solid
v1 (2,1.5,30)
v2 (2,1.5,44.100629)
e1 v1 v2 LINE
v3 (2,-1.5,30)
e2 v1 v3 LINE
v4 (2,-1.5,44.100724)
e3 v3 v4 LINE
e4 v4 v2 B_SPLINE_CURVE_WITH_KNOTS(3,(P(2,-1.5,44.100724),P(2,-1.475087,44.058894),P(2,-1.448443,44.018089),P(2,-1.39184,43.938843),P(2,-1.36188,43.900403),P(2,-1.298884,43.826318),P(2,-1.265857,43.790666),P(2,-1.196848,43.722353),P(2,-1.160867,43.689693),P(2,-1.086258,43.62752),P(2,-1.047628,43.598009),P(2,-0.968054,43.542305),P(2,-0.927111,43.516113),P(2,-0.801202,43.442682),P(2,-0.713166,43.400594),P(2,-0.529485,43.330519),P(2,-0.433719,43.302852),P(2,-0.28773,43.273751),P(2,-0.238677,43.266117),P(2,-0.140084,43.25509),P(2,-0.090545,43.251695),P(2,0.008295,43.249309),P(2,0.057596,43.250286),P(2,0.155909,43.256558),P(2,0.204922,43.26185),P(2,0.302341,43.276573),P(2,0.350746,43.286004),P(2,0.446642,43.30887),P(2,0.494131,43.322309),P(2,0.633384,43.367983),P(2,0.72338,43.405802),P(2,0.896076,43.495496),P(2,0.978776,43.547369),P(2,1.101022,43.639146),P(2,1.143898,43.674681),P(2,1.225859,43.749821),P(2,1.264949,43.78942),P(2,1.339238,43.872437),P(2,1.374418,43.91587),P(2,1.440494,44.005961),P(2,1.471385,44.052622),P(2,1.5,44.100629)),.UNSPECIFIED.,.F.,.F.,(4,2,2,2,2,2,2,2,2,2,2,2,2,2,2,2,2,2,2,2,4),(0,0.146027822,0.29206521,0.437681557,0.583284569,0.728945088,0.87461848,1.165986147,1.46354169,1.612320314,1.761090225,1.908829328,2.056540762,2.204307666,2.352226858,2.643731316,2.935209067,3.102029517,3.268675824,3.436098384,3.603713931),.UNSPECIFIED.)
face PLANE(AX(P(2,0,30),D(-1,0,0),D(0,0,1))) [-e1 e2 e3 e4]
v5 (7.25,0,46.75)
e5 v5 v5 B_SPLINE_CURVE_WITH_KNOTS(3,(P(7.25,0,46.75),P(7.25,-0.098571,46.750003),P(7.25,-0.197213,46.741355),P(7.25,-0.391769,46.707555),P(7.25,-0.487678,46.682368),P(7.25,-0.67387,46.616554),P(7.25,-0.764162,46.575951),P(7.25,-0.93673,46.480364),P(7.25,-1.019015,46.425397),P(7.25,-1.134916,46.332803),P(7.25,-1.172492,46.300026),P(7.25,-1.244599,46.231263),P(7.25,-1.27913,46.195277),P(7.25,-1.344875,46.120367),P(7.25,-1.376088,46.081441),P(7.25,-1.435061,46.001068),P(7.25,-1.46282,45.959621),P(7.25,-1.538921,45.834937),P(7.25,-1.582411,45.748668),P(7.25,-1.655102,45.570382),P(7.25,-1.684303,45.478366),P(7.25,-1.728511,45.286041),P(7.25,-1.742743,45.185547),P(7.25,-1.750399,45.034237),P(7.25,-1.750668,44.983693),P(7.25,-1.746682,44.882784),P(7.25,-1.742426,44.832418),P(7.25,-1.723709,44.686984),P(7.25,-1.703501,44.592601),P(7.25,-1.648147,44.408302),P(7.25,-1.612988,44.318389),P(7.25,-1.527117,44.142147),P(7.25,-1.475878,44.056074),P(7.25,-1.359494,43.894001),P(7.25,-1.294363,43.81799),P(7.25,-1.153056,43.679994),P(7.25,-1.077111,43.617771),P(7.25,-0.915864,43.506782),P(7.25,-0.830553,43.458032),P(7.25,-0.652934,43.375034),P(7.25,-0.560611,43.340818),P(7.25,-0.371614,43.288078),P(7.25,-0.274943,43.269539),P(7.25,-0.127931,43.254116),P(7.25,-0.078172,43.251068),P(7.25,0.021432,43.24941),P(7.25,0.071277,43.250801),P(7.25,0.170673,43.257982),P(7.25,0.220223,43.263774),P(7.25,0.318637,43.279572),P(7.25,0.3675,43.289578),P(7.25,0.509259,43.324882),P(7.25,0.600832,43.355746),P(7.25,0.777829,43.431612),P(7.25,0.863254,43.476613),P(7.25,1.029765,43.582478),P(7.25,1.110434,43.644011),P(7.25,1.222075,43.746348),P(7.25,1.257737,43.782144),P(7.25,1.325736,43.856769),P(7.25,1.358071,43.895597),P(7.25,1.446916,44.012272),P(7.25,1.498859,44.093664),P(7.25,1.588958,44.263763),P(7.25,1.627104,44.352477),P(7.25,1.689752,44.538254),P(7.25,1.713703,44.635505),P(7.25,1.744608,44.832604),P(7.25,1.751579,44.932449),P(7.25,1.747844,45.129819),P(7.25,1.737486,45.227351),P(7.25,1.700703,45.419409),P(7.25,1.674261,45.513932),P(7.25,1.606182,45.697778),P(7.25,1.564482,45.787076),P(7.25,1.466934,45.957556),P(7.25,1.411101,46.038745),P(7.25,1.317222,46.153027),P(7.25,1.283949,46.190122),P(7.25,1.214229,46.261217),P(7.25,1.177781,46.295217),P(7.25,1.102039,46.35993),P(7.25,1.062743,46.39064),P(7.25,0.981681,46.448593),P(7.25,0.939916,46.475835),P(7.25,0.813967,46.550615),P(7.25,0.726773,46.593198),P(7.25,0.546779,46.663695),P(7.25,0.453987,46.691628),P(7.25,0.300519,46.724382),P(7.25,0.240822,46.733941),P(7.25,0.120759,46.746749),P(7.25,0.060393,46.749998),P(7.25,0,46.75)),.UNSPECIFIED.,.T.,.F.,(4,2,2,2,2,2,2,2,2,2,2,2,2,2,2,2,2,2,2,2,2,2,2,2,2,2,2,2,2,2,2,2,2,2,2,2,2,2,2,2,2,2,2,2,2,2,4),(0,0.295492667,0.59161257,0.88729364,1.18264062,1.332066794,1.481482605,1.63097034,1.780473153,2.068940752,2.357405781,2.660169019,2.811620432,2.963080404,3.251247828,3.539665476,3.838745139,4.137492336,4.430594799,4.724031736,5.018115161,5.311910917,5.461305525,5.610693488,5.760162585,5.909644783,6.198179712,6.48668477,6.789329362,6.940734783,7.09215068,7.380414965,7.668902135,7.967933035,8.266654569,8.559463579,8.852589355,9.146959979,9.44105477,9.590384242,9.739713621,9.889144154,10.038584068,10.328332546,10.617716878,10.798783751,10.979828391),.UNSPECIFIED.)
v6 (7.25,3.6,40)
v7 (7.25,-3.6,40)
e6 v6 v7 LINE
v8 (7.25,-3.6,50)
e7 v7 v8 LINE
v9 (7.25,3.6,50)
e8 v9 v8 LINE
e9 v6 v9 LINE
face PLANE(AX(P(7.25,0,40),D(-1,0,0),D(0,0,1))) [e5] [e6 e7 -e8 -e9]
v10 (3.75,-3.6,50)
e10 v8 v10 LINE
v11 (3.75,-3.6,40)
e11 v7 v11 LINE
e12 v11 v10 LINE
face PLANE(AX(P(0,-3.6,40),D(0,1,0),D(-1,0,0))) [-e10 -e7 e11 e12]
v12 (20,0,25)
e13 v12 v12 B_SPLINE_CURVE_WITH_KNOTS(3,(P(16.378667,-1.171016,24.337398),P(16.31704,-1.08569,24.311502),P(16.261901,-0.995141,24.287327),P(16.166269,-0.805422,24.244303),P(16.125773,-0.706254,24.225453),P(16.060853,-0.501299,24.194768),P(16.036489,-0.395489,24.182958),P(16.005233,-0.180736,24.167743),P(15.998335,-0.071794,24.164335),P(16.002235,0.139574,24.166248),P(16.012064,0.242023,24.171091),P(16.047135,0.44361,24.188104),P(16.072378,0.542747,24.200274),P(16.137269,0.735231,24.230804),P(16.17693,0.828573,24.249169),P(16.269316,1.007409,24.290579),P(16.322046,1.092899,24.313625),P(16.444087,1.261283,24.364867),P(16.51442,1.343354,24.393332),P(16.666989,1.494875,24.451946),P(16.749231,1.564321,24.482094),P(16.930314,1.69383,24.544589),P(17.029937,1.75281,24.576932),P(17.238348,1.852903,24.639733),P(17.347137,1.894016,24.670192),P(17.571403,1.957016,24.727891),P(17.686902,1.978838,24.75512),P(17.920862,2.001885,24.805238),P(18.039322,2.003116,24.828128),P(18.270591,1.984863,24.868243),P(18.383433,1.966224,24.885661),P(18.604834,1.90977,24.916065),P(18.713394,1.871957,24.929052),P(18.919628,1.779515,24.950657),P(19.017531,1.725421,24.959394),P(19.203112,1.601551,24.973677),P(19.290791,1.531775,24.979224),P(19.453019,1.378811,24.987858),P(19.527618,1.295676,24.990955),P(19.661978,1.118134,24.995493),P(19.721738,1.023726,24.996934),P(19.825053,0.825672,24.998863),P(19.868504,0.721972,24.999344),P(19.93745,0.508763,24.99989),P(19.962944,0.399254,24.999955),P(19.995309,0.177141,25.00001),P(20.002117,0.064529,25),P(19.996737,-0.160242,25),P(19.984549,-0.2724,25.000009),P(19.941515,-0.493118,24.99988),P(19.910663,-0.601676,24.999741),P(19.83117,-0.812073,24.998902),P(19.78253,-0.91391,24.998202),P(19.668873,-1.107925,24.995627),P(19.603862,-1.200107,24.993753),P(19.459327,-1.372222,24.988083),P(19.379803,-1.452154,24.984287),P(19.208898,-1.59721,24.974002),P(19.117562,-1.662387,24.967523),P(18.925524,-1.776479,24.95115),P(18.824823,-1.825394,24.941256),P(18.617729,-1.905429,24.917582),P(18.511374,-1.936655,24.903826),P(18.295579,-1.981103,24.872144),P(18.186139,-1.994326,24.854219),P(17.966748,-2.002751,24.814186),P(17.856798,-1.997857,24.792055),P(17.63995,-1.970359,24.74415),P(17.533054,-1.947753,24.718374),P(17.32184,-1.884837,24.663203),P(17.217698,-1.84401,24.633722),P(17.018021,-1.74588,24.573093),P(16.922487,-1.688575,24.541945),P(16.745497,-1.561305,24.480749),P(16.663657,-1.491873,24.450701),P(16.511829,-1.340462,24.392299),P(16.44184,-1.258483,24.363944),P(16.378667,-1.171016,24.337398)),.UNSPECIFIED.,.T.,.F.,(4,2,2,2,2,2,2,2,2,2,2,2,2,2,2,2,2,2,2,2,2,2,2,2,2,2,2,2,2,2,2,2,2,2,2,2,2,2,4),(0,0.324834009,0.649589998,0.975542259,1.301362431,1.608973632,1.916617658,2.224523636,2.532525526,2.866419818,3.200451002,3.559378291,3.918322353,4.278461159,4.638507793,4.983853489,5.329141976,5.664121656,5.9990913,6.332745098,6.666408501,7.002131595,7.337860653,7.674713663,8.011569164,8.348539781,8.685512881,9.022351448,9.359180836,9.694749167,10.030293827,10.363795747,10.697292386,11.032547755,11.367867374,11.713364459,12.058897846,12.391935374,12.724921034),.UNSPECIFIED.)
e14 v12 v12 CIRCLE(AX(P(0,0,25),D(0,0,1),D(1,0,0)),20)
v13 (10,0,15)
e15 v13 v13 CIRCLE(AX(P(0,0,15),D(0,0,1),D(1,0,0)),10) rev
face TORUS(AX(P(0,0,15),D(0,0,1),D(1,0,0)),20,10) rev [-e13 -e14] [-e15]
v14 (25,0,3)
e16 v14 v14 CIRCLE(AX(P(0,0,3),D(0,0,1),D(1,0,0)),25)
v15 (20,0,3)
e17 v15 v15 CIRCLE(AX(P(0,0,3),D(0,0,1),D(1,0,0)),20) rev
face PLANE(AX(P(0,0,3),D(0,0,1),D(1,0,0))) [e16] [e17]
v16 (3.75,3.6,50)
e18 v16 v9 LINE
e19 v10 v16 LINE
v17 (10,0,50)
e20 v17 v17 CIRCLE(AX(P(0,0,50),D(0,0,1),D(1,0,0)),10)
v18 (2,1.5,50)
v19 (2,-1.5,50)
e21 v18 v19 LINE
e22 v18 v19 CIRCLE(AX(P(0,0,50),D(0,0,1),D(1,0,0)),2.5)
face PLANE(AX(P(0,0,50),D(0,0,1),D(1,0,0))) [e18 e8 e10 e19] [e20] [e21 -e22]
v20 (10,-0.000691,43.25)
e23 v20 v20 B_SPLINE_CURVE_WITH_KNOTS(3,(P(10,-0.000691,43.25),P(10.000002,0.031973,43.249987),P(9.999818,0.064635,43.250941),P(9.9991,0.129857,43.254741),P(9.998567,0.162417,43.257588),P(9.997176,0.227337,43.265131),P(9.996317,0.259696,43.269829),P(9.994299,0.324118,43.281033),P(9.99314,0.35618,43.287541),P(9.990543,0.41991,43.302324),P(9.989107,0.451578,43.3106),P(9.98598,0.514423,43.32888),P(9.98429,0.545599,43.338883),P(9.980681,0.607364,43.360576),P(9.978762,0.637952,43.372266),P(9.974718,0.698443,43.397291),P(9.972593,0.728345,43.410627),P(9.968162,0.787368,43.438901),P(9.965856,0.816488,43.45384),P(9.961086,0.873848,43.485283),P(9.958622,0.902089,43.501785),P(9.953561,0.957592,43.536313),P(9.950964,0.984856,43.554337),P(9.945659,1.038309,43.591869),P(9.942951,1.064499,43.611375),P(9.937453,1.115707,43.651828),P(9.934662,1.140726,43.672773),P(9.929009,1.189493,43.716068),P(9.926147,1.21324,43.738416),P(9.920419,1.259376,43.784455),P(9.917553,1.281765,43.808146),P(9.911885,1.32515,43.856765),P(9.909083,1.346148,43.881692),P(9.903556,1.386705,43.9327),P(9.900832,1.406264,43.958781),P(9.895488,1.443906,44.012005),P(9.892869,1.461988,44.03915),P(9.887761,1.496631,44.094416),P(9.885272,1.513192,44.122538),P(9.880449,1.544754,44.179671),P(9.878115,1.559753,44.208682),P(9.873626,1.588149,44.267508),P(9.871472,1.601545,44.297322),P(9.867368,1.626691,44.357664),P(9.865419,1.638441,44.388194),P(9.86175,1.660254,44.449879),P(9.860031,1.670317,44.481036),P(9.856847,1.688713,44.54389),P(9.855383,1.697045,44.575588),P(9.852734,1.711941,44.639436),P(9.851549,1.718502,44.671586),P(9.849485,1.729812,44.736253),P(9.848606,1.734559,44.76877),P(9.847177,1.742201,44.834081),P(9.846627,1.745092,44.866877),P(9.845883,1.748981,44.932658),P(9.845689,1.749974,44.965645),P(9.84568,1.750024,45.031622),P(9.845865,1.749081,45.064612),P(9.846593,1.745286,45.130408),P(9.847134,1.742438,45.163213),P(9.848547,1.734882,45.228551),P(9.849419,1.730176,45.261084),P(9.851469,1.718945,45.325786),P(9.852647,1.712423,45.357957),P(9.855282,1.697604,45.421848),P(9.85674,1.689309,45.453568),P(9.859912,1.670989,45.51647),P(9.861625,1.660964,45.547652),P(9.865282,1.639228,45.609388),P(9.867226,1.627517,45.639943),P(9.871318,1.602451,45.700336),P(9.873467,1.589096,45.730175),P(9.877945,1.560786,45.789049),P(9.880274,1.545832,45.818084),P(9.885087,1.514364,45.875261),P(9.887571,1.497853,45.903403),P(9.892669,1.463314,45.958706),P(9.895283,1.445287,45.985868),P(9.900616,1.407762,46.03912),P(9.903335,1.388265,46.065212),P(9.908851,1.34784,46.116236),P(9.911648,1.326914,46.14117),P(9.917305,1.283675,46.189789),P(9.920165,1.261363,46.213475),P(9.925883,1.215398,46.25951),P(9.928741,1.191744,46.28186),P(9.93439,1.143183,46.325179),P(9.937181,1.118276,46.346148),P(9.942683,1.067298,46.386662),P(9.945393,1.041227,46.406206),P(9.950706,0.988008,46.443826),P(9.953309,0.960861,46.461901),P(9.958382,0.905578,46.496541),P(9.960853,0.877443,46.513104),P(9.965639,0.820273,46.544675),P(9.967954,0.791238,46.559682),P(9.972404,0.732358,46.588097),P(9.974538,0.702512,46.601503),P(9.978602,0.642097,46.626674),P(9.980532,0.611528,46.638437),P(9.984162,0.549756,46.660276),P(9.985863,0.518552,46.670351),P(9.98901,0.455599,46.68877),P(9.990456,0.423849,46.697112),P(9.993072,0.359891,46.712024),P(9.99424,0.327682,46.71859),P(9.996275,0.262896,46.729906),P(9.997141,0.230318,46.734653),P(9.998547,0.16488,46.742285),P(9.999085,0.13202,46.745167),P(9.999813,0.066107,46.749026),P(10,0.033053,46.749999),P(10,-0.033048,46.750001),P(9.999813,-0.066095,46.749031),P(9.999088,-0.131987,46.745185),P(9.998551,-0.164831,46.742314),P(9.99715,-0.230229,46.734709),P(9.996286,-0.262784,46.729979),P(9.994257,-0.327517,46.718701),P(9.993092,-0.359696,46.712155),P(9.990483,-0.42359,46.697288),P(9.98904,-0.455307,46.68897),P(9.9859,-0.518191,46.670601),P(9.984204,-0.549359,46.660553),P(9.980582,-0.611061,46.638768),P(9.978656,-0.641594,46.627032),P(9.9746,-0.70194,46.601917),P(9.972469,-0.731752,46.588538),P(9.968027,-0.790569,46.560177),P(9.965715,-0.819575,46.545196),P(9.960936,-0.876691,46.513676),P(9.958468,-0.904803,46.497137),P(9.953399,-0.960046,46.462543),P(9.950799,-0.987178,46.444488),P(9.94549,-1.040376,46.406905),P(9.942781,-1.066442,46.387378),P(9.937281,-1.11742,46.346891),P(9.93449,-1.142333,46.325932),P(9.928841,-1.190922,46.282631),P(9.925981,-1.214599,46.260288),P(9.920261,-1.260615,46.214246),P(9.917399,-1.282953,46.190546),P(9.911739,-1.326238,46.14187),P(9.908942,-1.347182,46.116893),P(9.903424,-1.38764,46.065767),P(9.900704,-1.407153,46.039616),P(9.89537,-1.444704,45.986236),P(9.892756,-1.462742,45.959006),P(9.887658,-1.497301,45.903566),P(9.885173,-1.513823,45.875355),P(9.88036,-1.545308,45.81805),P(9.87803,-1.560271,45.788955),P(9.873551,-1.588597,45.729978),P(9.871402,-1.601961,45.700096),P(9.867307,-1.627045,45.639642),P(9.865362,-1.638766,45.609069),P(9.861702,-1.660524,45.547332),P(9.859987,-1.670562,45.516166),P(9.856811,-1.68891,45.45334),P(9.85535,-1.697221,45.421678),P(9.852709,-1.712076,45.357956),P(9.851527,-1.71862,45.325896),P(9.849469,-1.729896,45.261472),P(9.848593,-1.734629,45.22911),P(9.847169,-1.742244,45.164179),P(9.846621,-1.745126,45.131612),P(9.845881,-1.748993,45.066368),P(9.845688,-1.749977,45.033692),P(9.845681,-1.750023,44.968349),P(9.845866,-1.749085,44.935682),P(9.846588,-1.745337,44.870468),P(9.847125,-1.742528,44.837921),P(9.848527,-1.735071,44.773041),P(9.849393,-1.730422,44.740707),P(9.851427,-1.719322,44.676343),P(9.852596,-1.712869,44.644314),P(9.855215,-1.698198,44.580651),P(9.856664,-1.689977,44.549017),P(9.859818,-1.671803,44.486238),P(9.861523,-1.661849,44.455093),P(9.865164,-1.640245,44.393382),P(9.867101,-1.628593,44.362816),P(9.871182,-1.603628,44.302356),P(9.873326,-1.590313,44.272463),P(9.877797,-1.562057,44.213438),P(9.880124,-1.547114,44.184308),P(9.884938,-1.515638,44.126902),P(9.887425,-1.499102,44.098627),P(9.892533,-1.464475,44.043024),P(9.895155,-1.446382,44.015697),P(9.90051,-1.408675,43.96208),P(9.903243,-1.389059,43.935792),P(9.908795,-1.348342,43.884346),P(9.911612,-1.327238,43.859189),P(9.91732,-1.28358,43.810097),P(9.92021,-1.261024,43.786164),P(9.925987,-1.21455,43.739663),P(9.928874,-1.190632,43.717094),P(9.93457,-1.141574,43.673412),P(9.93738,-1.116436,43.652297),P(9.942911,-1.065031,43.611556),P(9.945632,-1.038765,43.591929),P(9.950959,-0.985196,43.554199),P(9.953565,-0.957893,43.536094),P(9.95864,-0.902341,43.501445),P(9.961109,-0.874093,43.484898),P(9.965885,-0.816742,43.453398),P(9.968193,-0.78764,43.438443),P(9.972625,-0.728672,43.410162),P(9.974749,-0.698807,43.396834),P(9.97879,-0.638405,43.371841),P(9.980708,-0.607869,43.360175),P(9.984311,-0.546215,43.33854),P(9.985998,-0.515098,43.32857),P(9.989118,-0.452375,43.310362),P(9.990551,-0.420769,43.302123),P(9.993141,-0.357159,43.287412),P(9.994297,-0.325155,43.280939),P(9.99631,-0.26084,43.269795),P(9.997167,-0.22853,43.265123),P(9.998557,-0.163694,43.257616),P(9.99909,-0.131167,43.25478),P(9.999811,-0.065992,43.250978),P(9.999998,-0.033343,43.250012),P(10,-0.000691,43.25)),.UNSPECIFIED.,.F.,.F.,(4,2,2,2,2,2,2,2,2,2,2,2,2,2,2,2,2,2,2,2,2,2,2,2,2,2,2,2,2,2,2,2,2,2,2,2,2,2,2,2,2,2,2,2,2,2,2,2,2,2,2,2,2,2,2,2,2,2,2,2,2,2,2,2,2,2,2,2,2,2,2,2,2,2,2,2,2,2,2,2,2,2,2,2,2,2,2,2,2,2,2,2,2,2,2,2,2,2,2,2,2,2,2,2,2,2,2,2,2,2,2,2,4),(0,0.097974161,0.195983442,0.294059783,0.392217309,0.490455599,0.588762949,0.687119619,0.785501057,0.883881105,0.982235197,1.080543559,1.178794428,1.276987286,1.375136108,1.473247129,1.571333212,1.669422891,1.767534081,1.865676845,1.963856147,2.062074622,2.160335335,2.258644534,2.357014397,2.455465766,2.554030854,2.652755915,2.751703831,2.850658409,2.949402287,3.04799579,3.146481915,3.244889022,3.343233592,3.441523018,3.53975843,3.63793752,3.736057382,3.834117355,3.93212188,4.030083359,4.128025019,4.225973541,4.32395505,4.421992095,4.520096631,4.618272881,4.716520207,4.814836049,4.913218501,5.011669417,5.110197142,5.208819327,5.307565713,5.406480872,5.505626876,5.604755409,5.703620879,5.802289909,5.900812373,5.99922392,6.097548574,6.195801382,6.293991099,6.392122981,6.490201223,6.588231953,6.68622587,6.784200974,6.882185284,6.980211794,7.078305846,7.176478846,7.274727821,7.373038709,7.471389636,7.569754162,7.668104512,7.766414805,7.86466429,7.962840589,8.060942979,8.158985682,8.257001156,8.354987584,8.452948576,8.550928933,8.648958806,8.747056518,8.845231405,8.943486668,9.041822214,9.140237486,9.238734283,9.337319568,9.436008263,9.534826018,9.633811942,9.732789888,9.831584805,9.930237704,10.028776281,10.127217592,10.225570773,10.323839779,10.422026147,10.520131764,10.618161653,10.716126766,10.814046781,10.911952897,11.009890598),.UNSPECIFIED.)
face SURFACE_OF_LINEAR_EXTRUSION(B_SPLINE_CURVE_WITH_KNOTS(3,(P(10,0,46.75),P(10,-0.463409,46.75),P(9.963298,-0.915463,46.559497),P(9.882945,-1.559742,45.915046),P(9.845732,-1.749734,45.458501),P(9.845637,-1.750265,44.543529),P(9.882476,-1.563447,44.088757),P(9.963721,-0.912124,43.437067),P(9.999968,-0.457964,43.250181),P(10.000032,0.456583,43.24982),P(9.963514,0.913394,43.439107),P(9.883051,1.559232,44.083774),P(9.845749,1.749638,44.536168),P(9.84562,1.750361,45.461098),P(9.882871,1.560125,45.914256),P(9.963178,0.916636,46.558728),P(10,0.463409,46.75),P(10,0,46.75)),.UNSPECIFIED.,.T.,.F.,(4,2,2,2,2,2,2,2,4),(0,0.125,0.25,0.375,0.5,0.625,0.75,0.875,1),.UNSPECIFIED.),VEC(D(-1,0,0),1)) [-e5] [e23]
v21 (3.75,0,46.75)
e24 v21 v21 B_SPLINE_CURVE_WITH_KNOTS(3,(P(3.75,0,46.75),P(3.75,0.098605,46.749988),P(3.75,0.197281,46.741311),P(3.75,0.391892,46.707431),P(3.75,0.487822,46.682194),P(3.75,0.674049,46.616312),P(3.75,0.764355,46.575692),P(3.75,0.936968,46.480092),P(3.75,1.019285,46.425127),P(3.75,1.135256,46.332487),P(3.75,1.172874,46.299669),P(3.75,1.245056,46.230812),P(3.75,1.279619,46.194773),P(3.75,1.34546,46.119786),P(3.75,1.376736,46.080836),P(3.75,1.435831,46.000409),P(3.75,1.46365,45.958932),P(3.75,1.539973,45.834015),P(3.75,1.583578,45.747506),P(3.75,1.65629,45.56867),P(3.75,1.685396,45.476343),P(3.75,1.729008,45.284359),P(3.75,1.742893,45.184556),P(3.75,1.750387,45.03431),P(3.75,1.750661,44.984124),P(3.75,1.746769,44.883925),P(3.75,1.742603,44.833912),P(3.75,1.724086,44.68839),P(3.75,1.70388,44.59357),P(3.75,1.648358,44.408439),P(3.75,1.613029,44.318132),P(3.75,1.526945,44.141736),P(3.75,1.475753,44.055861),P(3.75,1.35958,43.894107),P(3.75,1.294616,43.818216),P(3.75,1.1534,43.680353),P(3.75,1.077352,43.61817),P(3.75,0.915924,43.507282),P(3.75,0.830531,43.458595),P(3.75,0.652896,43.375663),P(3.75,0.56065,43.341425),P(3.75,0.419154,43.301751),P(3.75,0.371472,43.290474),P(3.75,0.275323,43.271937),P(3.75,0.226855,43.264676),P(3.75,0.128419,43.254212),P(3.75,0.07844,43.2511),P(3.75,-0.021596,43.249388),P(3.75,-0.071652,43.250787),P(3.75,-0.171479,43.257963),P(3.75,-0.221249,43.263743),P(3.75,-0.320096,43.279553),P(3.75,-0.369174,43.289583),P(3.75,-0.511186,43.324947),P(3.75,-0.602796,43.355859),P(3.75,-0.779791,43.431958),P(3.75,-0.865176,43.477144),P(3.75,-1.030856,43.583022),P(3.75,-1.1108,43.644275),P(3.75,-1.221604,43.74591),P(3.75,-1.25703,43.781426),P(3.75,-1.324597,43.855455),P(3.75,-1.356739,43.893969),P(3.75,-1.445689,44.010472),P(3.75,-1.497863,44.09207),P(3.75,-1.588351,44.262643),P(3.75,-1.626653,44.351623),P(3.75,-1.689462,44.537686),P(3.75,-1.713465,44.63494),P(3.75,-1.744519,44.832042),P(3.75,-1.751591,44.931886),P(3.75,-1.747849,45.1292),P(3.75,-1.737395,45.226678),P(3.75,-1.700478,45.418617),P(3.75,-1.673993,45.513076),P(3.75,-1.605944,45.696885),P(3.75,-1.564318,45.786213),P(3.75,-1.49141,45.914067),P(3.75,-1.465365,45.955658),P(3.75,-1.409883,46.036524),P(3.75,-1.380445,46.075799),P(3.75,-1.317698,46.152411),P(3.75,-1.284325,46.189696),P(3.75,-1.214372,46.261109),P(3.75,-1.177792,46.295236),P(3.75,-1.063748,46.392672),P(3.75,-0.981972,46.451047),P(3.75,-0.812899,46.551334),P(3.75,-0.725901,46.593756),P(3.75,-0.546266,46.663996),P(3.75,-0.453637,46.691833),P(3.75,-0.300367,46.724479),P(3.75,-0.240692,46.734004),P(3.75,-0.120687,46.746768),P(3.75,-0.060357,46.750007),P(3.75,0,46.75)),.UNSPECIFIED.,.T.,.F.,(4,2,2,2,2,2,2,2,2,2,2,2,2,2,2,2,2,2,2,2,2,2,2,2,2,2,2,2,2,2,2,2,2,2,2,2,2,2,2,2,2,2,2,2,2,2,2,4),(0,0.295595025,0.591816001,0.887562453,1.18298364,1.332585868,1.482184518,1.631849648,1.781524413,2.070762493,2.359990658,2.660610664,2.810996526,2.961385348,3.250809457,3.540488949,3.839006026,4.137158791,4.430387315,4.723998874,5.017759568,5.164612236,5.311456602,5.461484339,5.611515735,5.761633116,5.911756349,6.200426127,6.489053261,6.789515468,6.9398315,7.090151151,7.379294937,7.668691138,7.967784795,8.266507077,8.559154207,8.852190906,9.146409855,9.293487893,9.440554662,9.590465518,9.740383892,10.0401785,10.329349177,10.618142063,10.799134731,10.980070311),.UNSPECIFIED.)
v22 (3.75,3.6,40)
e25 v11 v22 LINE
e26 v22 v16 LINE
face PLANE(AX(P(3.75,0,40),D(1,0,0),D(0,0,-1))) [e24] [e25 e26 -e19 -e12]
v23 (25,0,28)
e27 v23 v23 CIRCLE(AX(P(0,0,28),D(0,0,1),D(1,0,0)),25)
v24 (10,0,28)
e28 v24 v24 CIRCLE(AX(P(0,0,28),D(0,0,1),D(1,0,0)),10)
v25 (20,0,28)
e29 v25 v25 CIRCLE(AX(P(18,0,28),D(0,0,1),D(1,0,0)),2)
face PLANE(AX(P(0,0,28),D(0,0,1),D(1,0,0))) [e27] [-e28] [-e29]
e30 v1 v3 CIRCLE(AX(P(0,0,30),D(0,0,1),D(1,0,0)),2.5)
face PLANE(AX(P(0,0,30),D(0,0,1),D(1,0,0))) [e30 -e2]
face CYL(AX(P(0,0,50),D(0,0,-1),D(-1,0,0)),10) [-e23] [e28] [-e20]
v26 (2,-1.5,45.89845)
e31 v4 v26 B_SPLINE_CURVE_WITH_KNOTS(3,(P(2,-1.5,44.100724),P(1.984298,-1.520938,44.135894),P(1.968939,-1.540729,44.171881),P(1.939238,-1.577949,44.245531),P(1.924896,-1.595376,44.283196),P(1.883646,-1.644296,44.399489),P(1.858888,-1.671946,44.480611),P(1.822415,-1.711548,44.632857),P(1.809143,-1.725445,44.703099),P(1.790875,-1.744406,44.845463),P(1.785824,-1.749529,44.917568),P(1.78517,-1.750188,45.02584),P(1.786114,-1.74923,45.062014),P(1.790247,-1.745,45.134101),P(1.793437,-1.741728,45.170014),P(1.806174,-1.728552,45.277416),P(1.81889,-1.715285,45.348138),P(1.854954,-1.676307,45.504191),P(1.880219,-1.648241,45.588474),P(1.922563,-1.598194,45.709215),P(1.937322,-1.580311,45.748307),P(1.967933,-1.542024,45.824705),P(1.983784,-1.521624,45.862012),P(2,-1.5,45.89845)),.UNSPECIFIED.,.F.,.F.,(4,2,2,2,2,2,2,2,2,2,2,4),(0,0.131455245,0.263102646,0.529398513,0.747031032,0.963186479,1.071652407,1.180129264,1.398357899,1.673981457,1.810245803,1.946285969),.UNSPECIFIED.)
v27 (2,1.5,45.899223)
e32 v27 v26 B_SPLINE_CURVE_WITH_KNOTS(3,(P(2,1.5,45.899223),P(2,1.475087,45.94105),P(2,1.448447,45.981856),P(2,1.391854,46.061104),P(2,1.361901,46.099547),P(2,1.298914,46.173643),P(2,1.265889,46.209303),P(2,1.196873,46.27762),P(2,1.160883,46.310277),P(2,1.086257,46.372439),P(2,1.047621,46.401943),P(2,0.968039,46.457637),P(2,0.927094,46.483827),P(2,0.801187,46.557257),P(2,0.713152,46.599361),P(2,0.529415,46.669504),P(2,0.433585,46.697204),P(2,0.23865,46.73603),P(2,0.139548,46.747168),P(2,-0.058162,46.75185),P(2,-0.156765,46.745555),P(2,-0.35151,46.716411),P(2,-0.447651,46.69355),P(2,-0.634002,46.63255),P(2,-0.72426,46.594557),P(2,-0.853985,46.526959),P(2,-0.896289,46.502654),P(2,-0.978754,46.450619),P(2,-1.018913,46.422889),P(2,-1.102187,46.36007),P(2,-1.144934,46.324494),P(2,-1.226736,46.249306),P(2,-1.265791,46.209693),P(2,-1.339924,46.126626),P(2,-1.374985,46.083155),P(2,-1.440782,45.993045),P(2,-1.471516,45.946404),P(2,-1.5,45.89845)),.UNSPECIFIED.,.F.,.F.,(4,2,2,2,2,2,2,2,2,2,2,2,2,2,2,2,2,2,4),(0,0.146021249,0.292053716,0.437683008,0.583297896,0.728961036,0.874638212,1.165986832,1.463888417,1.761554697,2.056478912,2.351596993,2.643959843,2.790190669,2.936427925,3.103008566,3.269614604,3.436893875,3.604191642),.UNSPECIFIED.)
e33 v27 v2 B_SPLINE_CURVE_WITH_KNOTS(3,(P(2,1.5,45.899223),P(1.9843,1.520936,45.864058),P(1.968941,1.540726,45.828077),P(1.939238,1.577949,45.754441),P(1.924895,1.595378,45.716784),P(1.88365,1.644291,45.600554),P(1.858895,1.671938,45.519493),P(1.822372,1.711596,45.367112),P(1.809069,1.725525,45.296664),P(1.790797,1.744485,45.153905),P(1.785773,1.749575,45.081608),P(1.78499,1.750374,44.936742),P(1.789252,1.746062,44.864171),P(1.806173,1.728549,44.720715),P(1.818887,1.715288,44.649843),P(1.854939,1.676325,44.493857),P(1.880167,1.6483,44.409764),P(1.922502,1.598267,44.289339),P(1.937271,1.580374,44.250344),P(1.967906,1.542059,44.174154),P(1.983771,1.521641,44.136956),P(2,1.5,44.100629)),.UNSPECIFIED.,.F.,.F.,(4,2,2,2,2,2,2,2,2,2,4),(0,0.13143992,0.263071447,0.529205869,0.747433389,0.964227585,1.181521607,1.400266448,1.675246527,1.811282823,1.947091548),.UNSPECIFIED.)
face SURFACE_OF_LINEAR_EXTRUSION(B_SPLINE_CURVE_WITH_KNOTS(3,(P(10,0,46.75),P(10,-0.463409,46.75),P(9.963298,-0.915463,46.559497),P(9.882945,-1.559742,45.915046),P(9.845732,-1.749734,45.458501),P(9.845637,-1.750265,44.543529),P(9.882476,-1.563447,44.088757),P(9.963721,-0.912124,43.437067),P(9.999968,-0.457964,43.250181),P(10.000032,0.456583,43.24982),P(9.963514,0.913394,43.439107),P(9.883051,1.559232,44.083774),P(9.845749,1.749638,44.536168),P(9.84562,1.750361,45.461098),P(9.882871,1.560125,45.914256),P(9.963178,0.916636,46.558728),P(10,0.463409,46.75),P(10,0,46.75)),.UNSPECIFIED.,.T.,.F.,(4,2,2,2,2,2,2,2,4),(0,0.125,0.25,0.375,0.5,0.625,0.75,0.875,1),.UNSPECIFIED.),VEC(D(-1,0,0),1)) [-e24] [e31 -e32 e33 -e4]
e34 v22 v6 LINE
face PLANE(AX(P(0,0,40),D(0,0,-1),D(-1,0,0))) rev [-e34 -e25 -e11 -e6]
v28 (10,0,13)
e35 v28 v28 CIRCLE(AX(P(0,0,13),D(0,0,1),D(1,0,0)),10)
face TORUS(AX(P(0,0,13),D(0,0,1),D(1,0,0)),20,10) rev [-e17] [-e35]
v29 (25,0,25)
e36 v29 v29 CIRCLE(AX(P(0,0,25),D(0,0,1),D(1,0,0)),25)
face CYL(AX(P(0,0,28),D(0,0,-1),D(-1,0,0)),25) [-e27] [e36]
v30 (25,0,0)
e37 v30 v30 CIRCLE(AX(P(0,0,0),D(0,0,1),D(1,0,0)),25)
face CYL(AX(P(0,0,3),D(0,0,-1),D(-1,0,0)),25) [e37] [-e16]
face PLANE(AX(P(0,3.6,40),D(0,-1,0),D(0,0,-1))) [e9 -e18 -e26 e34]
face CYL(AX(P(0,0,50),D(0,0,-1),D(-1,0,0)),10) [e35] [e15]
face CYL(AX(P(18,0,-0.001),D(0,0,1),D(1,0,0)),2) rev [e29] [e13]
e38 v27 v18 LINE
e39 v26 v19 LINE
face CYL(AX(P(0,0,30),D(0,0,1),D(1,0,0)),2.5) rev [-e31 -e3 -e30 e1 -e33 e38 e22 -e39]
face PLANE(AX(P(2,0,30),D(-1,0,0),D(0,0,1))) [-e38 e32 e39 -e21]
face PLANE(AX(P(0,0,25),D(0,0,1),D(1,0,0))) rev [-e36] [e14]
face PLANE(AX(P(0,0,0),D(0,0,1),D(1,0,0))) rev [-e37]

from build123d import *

# Parameters (mm, degrees)
CROQUIS1_R              = 10
SALIENTE_EXTRUIR2_DEPTH = 50
CROQUIS4_R              = 25
SALIENTE_EXTRUIR3_DEPTH = 3
SALIENTE_EXTRUIR4_START = 25
CROQUIS5_R              = 25
SALIENTE_EXTRUIR4_DEPTH = 3
REDONDEO2_R             = 10
CORTAR_EXTRUIR1_START   = 50
CORTAR_EXTRUIR1_DEPTH   = 20
CORTAR_EXTRUIR2_START   = 50
CROQUIS7_W              = 3.5
CROQUIS7_H              = 7.2
CORTAR_EXTRUIR2_DEPTH   = 10
CORTAR_EXTRUIR3_START   = 1.785357468
CORTAR_EXTRUIR3_DEPTH   = 8.214642632
CORTAR_EXTRUIR4_START   = 24.165153
CROQUIS9_R              = 2
CORTAR_EXTRUIR4_DEPTH   = 3.834847


# Read off the part's stored shape, not the designer's step: Cortar-Extruir3
with BuildPart() as part:
    # Croquis1 → Saliente-Extruir2 (new body)
    with BuildSketch(Plane.XY):
        Circle(CROQUIS1_R)
    extrude(amount=SALIENTE_EXTRUIR2_DEPTH)

    # Croquis4 → Saliente-Extruir3 (add)
    with BuildSketch(Plane.XY):
        Circle(CROQUIS4_R)
    extrude(amount=SALIENTE_EXTRUIR3_DEPTH)

    # Croquis5 → Saliente-Extruir4 (add)
    with BuildSketch(Plane.XY.offset(SALIENTE_EXTRUIR4_START)):
        Circle(CROQUIS5_R)
    extrude(amount=SALIENTE_EXTRUIR4_DEPTH)

    # Redondeo2
    redondeo2_edges = [part.edges().sort_by_distance(p)[0] for p in [
        (-10, 0, 25),
        (-10, 0, 3),
    ]]
    fillet(redondeo2_edges, radius=REDONDEO2_R)

    # Croquis6 → Cortar-Extruir1 (cut)
    with BuildSketch(Plane.XY.offset(CORTAR_EXTRUIR1_START)):
        with BuildLine():
            Line((2, 1.5), (2, -1.5))
            ThreePointArc((2, -1.5), (-2.5, 0), (2, 1.5))
        make_face()
    extrude(amount=-CORTAR_EXTRUIR1_DEPTH, mode=Mode.SUBTRACT)

    # Croquis7 → Cortar-Extruir2 (cut)
    with BuildSketch(Plane.XY.offset(CORTAR_EXTRUIR2_START)):
        with Locations((5.5, 0)):
            Rectangle(CROQUIS7_W, CROQUIS7_H)
    extrude(amount=-CORTAR_EXTRUIR2_DEPTH, mode=Mode.SUBTRACT)

    # Cortar-Extruir3 outline → Cortar-Extruir3 (cut)
    with BuildSketch(Plane(origin=(0, 0, 0), x_dir=(0, 0, -1), z_dir=(1, 0, 0)).offset(CORTAR_EXTRUIR3_START)):
        with BuildLine():
            add(Edge.make_bspline(
                [(-43.250000008, 0), (-43.250010298, 0.457042806), (-43.439269311, 0.91355666), (-44.08377392, 1.559232298), (-44.536167579, 1.749638189), (-45.461098225, 1.750360744), (-45.914256169, 1.560125471), (-46.558728463, 0.916635921), (-46.75, 0.463408547), (-46.75, -0.463408547), (-46.559497121, -0.915462774), (-45.915045576, -1.559741953), (-45.458501244, -1.749734355), (-44.543528816, -1.750265056), (-44.088756623, -1.563446648), (-43.437067231, -0.912124478), (-43.250180582, -0.457964068), (-43.250000045, -0.000460382), (-43.250000003, -0.000230191), (-43.250000008, 0)],
                knots=[0.500062925, 0.500062925, 0.500062925, 0.500062925, 0.625, 0.625, 0.750000001, 0.750000001, 0.875000002, 0.875000002, 1.000000004, 1.000000004, 1.125000006, 1.125000006, 1.250000009, 1.250000009, 1.375000013, 1.375000013, 1.500000015, 1.500000015, 1.50006294, 1.50006294, 1.50006294, 1.50006294], degree=3))
        make_face()
    extrude(amount=CORTAR_EXTRUIR3_DEPTH, mode=Mode.SUBTRACT)

    # Croquis9 → Cortar-Extruir4 (cut)
    with BuildSketch(Plane.XY.offset(CORTAR_EXTRUIR4_START)):
        with Locations((18, 0)):
            Circle(CROQUIS9_R)
    extrude(amount=CORTAR_EXTRUIR4_DEPTH, mode=Mode.SUBTRACT)


solid = part.part
